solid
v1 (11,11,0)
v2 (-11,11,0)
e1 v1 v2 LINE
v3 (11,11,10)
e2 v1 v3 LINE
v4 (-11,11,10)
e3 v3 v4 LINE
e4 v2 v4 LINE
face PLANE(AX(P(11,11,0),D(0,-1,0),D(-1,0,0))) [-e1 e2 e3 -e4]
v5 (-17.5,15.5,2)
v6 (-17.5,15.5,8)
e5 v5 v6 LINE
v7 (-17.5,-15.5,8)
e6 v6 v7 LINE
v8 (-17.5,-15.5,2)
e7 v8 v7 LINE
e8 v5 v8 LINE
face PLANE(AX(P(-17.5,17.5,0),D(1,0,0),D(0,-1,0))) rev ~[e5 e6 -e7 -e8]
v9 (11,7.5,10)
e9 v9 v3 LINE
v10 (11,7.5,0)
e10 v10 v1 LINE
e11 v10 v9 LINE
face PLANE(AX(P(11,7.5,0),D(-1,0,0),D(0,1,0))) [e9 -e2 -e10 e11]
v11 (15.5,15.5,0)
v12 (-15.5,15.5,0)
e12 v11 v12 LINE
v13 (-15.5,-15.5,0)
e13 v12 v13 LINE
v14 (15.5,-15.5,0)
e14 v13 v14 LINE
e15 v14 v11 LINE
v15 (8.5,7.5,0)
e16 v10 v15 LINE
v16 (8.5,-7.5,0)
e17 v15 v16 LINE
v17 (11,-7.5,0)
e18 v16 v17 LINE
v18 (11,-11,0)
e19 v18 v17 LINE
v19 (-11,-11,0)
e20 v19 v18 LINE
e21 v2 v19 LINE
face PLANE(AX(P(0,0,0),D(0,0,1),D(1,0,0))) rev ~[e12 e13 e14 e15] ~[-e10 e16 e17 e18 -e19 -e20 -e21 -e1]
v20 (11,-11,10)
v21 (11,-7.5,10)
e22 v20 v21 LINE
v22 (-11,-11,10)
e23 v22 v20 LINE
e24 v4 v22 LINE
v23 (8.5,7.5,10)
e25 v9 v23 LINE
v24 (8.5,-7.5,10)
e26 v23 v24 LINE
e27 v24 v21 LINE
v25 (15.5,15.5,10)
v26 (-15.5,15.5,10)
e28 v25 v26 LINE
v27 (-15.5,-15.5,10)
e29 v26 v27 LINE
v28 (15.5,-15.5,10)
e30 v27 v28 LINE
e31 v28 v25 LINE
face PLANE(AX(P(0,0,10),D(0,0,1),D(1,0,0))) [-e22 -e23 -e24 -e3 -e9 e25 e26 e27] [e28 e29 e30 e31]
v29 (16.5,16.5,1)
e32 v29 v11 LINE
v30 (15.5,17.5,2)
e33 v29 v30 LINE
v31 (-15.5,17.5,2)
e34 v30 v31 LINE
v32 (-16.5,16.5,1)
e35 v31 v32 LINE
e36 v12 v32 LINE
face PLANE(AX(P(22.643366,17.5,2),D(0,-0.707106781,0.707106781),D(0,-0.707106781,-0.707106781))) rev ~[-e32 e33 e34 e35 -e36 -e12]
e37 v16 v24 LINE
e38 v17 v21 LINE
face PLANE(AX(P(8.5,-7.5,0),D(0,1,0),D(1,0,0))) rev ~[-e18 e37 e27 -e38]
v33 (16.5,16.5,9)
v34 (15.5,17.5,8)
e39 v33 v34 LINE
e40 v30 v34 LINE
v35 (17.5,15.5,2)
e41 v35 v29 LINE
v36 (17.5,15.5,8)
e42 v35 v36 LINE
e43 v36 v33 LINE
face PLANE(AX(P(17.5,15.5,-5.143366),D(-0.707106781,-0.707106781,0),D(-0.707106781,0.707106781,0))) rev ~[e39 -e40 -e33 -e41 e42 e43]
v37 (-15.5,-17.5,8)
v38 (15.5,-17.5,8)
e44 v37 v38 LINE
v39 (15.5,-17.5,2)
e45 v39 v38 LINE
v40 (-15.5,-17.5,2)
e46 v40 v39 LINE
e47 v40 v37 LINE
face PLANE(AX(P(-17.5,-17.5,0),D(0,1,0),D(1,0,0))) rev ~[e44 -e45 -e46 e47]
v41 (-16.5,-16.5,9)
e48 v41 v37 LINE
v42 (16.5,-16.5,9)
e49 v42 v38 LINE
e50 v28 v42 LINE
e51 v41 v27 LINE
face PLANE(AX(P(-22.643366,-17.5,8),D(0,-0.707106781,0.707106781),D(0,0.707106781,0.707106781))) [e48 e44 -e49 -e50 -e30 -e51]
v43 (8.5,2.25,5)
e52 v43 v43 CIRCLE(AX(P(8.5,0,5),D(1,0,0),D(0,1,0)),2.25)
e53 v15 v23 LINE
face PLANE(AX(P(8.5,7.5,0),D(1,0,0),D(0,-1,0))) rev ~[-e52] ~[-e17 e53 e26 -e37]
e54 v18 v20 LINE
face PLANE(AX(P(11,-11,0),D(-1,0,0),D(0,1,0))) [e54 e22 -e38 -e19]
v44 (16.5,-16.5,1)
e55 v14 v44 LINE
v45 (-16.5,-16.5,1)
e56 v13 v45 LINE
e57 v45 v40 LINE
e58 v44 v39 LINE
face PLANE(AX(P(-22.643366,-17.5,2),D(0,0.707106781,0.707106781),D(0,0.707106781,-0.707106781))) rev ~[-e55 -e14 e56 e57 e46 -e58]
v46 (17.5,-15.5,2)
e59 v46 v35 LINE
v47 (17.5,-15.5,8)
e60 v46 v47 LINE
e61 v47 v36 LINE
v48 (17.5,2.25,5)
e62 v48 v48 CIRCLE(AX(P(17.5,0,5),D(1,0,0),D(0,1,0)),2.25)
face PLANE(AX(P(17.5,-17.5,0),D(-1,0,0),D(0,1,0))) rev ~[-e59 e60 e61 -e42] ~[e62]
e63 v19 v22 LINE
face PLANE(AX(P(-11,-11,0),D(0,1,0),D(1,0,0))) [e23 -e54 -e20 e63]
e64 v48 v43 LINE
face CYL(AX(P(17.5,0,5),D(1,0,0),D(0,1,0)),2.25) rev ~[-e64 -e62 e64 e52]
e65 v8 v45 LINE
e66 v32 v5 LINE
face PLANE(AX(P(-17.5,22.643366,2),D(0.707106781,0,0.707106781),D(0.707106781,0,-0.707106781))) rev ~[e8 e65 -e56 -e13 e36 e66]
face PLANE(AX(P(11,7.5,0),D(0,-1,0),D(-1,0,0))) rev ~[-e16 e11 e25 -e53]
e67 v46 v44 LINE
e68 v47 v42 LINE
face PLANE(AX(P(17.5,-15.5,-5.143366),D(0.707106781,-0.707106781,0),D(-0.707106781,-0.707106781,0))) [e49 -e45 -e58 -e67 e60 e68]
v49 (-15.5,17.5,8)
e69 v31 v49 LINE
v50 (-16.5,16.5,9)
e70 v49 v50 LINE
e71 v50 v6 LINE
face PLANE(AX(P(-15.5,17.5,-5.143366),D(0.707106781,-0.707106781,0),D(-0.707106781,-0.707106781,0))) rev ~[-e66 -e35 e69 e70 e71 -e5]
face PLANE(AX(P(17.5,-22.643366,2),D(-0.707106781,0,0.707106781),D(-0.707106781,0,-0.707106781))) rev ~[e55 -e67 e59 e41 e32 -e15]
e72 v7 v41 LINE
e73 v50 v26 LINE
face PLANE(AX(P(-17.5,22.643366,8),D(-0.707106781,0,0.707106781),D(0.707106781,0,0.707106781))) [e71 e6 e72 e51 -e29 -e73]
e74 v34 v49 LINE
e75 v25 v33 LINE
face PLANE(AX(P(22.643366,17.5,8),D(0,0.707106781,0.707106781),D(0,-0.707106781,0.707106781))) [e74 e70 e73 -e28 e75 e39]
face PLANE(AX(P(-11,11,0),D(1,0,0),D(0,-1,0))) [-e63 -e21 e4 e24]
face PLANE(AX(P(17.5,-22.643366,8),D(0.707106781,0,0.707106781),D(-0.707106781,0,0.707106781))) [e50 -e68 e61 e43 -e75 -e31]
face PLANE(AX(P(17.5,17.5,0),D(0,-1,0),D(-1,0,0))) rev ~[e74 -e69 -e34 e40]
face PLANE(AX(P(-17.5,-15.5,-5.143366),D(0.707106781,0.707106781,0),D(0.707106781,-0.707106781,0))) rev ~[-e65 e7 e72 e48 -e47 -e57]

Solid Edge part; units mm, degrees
sketch "Sketch1" plane through (0, 0, 0) normal (0, 0, 1) x (1, 0, 0)
  line L0 (8.5, 7.5) -> (8.5, -7.5)
  line L1 (8.5, -7.5) -> (11, -7.5)
  line L2 (11, -11) -> (11, -7.5)
  line L3 (-11, -11) -> (11, -11)
  line L4 (-11, 11) -> (-11, -11)
  line L5 (11, 11) -> (-11, 11)
  line L6 (11, 7.5) -> (11, 11)
  line L7 (11, 7.5) -> (8.5, 7.5)
  line L8 (17.5, -17.5) -> (17.5, 17.5)
  line L9 (17.5, 17.5) -> (-17.5, 17.5)
  line L10 (-17.5, 17.5) -> (-17.5, -17.5)
  line L11 (-17.5, -17.5) -> (17.5, -17.5)
  dimension "D1" = 15
  dimension "D2" = 22
  dimension "D3" = 22
extrude "Protrusion1" add sketch "Sketch1" along normal blind 10
chamfer "Chaflán_1" distance 2 angle 45 12 edges at (17.5, -17.5, 5) (-17.5, -17.5, 5) (-17.5, 17.5, 5) (17.5, 17.5, 5) (0, 17.5, 10) (-17.5, 0, 10) (0, 17.5, 0) (-17.5, 0, 0) (0, -17.5, 0) (17.5, 0, 0) (17.5, 0, 10) (0, -17.5, 10)
sketch "Sketch2" plane through (17.5, 0, 5) normal (1, 0, 0) x (0, 1, 0)
  circle A0 centre (0, 0) radius 2.25
extrude "Cutout1" cut sketch "Sketch2" against normal up to surface (9 mm away)
